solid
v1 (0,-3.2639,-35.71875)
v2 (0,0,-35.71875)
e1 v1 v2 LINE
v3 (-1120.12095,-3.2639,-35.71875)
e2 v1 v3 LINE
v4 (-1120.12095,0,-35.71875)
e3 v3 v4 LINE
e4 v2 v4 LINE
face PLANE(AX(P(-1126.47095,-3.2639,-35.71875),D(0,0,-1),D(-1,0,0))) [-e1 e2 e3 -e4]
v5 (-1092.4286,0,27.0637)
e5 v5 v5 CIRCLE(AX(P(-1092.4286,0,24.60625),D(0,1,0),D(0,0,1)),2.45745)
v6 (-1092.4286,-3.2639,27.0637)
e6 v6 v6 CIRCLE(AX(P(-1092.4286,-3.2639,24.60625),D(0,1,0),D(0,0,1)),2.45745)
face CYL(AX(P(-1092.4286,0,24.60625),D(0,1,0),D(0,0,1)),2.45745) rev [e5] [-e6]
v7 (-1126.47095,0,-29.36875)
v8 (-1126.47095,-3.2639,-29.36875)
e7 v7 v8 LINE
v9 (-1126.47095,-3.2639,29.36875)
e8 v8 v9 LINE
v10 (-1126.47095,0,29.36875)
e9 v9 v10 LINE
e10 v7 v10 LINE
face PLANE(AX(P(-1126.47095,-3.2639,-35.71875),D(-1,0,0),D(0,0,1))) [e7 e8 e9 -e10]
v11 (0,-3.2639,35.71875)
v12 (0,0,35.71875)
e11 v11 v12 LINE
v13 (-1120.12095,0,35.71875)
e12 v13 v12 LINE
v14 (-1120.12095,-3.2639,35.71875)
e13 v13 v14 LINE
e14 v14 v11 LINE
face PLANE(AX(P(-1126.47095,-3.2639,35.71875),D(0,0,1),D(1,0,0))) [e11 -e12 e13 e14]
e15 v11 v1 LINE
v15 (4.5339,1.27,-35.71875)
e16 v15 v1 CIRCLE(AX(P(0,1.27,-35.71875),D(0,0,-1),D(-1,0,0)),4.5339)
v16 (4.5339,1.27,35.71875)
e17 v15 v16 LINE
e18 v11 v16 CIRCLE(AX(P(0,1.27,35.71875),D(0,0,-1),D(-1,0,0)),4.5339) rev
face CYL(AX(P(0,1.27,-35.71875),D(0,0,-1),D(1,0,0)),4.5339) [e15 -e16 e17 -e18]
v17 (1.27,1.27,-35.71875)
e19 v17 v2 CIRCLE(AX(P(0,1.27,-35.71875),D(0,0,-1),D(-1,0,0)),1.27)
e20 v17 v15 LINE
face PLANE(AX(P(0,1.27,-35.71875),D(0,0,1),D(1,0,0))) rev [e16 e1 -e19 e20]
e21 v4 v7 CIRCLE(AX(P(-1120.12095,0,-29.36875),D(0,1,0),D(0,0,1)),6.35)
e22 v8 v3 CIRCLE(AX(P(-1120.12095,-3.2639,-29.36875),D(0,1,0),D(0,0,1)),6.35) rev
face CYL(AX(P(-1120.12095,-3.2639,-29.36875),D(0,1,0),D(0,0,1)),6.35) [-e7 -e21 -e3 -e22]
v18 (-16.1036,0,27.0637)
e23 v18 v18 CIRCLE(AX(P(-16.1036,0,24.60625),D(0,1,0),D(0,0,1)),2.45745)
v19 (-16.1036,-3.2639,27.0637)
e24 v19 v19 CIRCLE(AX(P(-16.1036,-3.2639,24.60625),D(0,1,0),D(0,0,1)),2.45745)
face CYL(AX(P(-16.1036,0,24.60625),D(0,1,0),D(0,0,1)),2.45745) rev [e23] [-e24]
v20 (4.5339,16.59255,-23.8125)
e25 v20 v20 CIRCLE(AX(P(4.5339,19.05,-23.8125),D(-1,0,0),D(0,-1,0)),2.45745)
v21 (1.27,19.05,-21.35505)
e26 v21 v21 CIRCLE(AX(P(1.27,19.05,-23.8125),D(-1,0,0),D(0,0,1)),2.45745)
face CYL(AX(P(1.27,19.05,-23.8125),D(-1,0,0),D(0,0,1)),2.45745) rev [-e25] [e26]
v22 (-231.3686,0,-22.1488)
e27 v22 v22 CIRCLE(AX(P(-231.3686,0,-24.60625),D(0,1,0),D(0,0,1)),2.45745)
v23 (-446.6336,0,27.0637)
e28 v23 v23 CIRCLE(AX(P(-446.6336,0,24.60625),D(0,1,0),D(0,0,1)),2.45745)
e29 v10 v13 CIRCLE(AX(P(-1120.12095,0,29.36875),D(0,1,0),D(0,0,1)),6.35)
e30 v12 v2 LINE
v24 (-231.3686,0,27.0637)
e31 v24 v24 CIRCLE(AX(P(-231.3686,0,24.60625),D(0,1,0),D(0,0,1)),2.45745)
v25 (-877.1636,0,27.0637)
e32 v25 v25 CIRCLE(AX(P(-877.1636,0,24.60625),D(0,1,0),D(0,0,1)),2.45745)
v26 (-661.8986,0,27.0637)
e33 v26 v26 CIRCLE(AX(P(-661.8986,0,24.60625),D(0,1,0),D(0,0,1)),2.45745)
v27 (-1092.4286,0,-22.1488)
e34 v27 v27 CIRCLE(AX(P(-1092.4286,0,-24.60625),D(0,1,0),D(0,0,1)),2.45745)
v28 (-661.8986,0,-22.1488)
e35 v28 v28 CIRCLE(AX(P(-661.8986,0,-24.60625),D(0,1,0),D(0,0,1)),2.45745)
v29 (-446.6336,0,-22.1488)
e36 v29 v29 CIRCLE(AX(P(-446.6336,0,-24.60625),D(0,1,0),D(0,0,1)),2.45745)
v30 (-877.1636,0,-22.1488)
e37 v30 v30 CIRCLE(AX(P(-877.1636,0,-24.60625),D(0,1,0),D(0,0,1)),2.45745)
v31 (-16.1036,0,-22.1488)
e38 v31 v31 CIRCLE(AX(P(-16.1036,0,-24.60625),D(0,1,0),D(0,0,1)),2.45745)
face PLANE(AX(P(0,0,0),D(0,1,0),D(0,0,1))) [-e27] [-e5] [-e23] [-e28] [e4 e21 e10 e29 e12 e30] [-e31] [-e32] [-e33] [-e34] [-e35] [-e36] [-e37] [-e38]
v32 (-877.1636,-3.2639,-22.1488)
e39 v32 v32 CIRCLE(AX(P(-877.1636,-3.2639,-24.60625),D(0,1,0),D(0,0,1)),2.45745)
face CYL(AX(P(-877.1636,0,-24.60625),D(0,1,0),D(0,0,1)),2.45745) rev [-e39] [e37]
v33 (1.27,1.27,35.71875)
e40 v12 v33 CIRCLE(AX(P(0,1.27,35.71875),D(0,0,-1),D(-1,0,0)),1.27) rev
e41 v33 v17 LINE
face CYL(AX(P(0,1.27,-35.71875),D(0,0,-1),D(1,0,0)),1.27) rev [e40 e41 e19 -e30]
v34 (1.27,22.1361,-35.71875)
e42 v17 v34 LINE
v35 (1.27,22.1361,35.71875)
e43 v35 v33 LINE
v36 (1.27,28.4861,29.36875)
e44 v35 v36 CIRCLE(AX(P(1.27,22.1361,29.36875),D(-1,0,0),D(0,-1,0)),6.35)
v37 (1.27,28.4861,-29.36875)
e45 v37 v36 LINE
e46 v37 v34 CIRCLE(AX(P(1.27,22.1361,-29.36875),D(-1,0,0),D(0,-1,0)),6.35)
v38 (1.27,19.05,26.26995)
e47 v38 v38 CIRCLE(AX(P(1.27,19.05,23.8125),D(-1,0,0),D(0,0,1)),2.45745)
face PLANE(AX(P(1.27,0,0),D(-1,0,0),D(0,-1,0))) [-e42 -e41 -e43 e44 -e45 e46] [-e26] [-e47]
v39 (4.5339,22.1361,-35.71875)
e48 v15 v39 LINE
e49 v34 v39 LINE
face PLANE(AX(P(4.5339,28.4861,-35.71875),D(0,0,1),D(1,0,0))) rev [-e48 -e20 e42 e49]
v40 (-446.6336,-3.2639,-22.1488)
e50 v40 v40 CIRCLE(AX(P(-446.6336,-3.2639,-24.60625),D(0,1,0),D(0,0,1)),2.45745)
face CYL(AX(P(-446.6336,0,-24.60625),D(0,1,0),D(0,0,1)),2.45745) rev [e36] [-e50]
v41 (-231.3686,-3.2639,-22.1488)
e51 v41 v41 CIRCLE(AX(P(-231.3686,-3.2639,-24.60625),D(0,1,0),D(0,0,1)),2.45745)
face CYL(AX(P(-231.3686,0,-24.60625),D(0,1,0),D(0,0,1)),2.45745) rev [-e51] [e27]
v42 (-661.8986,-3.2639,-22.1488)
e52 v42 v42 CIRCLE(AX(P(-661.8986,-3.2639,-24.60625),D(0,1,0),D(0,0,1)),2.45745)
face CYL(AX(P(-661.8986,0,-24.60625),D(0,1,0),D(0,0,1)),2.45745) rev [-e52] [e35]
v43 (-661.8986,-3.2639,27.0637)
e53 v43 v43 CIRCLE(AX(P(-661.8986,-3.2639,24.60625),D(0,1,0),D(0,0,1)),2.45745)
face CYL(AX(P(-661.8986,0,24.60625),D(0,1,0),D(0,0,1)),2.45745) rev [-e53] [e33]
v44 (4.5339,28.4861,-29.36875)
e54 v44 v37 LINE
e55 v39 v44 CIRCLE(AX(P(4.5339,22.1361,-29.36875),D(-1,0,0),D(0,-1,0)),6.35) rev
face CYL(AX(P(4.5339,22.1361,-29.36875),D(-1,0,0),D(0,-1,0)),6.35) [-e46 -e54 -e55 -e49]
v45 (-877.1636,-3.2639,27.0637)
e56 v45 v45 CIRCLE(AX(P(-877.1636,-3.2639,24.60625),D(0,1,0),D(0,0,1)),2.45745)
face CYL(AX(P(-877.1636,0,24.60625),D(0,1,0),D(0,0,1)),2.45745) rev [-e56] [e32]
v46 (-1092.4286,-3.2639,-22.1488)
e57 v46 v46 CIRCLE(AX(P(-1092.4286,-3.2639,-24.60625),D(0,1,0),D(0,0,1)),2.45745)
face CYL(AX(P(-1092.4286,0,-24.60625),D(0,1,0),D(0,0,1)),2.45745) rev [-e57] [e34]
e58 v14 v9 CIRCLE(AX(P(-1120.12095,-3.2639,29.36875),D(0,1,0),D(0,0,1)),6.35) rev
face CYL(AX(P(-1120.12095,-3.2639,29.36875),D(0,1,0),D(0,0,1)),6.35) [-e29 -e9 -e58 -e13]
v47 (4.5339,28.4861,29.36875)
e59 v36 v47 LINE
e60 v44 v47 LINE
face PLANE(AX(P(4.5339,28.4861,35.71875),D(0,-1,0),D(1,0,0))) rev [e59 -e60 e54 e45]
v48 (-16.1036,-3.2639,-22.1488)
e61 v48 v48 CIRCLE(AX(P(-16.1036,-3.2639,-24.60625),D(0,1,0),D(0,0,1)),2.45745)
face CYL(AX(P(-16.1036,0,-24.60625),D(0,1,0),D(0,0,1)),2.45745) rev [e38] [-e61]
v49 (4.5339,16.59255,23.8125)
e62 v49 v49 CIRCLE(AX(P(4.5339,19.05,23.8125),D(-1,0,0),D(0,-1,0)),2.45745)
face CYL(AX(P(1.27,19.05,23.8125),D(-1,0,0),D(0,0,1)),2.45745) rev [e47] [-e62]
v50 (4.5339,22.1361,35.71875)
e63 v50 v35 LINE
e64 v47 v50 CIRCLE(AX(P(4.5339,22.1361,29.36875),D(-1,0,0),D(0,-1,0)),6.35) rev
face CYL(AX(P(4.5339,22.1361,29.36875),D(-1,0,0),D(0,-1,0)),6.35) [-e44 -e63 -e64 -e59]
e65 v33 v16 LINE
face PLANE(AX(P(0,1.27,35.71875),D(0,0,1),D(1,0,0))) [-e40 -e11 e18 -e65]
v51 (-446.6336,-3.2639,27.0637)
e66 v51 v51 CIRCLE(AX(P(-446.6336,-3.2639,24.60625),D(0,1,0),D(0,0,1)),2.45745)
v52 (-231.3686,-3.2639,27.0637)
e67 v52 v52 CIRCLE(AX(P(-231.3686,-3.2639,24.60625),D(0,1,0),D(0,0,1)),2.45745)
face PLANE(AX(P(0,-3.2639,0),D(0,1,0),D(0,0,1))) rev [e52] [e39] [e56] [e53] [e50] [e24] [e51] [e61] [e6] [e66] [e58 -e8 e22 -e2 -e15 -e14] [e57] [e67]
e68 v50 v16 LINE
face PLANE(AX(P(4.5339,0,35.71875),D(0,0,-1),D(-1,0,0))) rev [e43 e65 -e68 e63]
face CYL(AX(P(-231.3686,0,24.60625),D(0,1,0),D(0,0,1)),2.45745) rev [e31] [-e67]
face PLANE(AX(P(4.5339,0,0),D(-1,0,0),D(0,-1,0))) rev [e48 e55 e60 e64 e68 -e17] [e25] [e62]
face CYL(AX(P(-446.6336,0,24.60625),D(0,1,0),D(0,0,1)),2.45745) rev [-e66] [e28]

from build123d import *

# Parameters (mm, degrees)
SKETCH1_W                    = 1126.47095
SKETCH1_H                    = 71.4375
BASE_FLANGE1_DEPTH           = 3.2639
EDGE_FLANGE2_DEPTH           = 71.4375
F_10_0_1935_DIAMETER_HOLE1_D = 4.9149
LPATTERN1_COUNT              = 6
LPATTERN1_PITCH              = 215.265
F_10_0_1935_DIAMETER_HOLE2_D = 4.9149
FILLET1_R                    = 6.35


# Sheet-metal steps are written as plain solids
with BuildPart() as part:
    # Sketch1 → Base-Flange1 (new body)
    with BuildSketch(Plane(origin=(0, 0, 0), x_dir=(1, 0, 0), z_dir=(0, 1, 0))):
        with Locations((-563.235475, 0)):
            Rectangle(SKETCH1_W, SKETCH1_H)
    extrude(amount=-BASE_FLANGE1_DEPTH)

    # Edge-Flange2 section (across the edge) → Edge-Flange2 (add)
    with BuildSketch(Plane(origin=(1.27, 0, 35.71875), x_dir=(-1, 0, 0), z_dir=(0, 0, -1))):
        with BuildLine():
            Line((-3.2639, 1.27), (-3.2639, 28.4861))
            Line((-3.2639, 28.4861), (0, 28.4861))
            Line((0, 28.4861), (0, 1.27))
            ThreePointArc((0, 1.27), (0.371974388, 0.371974388), (1.27, 0))
            Line((1.27, 0), (1.27, -3.2639))
            ThreePointArc((1.27, -3.2639), (-1.935951435, -1.935951435), (-3.2639, 1.27))
        make_face()
    extrude(amount=EDGE_FLANGE2_DEPTH)

    # #10 (0.1935) Diameter Hole1 (through all)
    with Locations(Plane(origin=(0, 0, 0), x_dir=(1, 0, 0), z_dir=(0, 1, 0))):
        with Locations((-16.1036, 24.60625), (-16.1036, -24.60625)):
            f_10_0_1935_diameter_hole1 = Hole(F_10_0_1935_DIAMETER_HOLE1_D / 2)

    # LPattern1: #10 (0.1935) Diameter Hole1 ×6
    with Locations(*[(-i * LPATTERN1_PITCH, 0, 0) for i in range(1, LPATTERN1_COUNT)]):
        add(f_10_0_1935_diameter_hole1, mode=Mode.SUBTRACT)

    # #10 (0.1935) Diameter Hole2 (through all)
    with Locations(Plane.ZY.offset(-1.27)):
        with Locations((-23.8125, 19.05), (23.8125, 19.05)):
            Hole(F_10_0_1935_DIAMETER_HOLE2_D / 2)

    # Fillet1
    fillet1_edges = [part.edges().sort_by_distance(p)[0] for p in [
        (2.90195, 28.4861, 35.71875),
        (2.90195, 28.4861, -35.71875),
        (-1126.47095, -1.63195, -35.71875),
        (-1126.47095, -1.63195, 35.71875),
    ]]
    fillet(fillet1_edges, radius=FILLET1_R)


solid = part.part
